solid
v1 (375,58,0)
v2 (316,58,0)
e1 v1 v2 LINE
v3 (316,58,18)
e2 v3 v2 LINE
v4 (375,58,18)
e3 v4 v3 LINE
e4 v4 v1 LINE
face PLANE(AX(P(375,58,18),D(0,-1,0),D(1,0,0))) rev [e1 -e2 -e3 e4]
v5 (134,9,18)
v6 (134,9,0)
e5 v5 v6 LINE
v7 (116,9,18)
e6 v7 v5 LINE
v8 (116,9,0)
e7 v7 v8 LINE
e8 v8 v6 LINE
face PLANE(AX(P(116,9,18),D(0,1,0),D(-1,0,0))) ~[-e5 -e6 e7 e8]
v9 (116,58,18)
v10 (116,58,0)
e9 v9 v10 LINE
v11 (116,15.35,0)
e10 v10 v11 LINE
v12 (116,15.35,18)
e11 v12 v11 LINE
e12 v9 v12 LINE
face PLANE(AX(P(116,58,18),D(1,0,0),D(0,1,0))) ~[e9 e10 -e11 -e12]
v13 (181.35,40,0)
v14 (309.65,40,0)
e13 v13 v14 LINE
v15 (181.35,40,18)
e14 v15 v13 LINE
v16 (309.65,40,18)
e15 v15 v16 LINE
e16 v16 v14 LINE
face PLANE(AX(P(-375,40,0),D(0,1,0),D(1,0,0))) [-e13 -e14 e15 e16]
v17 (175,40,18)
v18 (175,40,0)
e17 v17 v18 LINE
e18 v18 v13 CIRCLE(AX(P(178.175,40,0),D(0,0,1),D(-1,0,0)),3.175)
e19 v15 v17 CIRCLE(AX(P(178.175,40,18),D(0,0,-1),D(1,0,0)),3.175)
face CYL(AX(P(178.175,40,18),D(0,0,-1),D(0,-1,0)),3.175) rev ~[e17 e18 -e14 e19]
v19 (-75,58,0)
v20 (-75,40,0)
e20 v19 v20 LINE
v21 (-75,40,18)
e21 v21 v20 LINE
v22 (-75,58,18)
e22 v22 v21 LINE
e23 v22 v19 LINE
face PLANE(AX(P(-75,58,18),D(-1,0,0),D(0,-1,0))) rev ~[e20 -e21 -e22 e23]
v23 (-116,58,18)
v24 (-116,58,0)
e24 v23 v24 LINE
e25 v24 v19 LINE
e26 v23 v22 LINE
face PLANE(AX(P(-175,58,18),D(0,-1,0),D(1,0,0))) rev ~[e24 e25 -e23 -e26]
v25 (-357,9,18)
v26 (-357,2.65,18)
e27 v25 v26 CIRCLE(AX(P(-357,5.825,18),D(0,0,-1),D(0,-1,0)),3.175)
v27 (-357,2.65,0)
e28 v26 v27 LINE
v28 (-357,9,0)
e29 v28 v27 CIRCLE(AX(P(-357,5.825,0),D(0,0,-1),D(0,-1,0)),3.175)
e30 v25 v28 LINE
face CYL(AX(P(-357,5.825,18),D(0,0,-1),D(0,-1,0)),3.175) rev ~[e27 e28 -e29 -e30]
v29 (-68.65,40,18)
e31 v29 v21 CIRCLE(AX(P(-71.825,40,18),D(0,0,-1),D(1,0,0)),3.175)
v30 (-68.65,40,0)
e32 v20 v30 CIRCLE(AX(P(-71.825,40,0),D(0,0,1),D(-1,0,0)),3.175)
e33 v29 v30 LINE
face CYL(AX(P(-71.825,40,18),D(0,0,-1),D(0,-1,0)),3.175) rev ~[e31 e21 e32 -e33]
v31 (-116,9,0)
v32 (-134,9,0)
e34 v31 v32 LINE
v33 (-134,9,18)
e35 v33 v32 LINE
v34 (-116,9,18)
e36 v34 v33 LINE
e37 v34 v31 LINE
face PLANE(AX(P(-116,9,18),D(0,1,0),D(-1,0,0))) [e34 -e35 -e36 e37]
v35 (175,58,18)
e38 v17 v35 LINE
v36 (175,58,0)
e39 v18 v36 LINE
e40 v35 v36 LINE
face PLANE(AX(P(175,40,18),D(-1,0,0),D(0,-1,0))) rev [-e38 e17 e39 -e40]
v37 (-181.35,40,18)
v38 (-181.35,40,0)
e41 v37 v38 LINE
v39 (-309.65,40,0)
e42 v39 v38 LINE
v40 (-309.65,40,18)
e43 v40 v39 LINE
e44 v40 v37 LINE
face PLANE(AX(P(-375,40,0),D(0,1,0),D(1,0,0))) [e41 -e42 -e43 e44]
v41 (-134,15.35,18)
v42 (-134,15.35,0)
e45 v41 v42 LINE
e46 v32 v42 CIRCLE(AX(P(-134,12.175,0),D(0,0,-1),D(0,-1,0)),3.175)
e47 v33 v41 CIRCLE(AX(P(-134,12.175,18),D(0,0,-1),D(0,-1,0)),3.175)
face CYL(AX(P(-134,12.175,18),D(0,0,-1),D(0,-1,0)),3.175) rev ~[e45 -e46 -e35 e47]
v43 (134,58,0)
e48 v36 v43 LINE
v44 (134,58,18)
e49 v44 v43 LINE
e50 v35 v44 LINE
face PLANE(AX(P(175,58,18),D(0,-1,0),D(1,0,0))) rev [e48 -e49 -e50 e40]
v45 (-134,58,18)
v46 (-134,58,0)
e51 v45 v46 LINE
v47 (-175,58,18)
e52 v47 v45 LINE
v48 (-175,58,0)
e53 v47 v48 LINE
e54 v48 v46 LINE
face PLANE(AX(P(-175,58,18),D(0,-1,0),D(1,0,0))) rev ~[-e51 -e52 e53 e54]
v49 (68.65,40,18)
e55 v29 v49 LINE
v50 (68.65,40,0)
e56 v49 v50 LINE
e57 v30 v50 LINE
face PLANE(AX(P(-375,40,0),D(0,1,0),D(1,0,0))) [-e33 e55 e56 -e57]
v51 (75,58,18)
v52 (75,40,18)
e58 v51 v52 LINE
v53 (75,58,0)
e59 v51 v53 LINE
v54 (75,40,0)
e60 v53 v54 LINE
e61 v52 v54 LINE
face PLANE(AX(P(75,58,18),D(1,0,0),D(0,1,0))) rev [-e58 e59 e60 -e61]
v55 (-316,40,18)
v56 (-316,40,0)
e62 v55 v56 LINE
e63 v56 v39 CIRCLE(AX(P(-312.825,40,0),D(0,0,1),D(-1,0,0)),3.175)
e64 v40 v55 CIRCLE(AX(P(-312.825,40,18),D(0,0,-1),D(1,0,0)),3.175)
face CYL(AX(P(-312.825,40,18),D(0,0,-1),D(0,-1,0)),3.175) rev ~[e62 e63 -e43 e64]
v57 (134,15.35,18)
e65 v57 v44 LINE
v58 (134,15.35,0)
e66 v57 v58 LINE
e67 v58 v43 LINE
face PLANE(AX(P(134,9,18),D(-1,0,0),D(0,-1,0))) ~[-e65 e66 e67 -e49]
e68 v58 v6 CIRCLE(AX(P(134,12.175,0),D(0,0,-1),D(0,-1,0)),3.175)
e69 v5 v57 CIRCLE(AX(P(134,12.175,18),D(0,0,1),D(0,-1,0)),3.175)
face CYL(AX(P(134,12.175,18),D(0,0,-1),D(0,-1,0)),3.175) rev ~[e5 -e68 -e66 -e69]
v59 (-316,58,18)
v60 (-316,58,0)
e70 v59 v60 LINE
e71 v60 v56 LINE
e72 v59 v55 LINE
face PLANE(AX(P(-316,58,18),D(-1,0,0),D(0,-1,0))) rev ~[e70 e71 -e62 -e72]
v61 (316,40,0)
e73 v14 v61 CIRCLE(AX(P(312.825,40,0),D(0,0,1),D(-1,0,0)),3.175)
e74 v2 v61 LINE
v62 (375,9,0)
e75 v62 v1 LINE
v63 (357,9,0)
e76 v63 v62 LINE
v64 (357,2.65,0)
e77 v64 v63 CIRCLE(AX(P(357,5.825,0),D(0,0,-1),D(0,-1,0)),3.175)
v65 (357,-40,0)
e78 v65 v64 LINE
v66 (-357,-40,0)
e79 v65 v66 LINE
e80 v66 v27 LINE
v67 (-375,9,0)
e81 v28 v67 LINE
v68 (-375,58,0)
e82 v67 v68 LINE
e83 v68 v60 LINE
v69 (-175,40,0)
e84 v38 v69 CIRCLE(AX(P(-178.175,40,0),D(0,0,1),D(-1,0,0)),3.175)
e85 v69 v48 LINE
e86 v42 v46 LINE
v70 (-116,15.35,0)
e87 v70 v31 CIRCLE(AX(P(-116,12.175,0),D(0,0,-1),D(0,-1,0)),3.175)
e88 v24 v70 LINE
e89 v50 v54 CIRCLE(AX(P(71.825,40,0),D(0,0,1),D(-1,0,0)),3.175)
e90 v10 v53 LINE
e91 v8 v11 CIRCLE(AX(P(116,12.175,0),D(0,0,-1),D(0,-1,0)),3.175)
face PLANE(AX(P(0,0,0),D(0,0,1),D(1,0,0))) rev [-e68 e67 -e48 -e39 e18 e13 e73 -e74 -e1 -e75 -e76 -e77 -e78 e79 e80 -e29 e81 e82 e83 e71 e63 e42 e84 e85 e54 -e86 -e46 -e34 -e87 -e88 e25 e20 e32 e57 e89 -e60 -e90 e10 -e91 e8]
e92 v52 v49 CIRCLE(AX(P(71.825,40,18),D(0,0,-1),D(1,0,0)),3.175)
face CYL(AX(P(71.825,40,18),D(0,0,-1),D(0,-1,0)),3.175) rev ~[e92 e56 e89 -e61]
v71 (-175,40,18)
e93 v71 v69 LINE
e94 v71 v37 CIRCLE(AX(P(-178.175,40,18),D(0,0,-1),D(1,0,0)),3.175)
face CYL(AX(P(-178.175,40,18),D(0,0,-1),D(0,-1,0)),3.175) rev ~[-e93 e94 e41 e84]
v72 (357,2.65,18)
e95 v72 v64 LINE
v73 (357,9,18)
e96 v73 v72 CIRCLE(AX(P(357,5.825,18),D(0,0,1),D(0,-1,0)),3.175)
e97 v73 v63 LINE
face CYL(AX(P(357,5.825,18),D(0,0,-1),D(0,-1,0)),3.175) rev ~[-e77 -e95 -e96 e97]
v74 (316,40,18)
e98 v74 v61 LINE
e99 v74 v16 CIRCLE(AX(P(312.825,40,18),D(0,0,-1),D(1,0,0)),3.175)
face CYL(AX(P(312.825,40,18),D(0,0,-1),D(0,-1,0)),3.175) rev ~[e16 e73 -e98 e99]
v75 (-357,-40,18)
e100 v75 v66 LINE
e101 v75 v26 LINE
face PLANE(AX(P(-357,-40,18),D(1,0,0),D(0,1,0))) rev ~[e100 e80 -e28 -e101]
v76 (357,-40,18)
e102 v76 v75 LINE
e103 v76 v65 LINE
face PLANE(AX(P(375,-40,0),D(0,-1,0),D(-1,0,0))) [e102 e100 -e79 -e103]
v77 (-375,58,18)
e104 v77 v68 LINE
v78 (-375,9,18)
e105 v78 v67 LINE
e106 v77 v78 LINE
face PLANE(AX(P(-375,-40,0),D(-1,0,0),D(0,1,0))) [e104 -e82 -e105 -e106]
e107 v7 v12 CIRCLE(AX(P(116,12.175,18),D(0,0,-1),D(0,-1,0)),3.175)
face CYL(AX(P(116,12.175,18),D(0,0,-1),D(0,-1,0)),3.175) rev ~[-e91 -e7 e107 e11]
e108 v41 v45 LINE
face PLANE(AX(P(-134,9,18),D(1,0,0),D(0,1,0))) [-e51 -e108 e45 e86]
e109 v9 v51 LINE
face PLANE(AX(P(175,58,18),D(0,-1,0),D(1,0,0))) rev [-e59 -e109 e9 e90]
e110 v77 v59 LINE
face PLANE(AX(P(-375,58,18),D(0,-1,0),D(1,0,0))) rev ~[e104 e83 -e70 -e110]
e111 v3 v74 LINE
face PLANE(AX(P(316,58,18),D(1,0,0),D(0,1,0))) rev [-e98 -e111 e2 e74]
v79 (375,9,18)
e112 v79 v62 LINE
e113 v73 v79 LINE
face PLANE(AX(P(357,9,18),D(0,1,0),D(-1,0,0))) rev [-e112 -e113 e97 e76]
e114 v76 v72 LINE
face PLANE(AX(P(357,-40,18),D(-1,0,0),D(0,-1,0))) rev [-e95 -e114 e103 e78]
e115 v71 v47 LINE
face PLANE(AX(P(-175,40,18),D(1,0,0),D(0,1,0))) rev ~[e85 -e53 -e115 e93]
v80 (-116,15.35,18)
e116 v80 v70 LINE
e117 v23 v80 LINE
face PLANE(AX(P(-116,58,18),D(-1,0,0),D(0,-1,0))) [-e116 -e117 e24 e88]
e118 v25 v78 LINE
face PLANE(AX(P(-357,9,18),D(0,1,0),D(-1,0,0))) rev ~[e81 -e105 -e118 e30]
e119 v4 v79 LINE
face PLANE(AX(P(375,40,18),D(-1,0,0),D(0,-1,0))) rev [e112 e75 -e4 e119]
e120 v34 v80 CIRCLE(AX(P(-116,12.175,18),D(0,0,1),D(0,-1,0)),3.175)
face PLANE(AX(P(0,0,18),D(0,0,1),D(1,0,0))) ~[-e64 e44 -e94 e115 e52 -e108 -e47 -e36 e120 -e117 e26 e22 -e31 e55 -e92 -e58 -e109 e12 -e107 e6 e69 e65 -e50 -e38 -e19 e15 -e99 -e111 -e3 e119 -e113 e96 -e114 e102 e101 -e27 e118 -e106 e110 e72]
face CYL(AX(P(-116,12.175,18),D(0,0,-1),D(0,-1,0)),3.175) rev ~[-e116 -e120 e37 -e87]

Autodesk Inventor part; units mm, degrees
ref_plane "YZ Plane" through (0, 0, 0) normal (1, 0, 0) x (0, 1, 0)
sketch "Sketch1" plane through (0, 0, 0) normal (0, 0, 1) x (1, 0, 0)
  line L0 (-375, 40) -> (375, 40)
  line L1 (375, 40) -> (375, -40)
  line L2 (375, -40) -> (-375, -40)
  line L3 (-375, -40) -> (-375, 40)
  point P0 (0, 0)
  point P1 (375, 0)
  point P2 (0, 40)
  dimension "d0" = 750
  dimension "d1" = 80
extrude "Extrusion1" add sketch "Sketch1" along normal blind 18
sketch "Sketch2" plane through (0, 0, 18) normal (0, 0, 1) x (1, 0, 0)
  line L0 (375, 40) -> (-375, 40) projected
  line L1 (-375, 40) -> (-375, -40) projected
  line L2 (-375, -40) -> (375, -40) projected
  line L3 (375, -40) -> (375, 40) projected
  line L4 (-375, 58) -> (-316, 58)
  line L5 (-316, 58) -> (-316, 40)
  line L6 (-316, 40) -> (-375, 40)
  line L7 (-375, 40) -> (-375, 58)
  point P0 (0, 0)
  point P1 (-345.5, 40)
  point P2 (0, 40)
  point P3 (-375, 49)
  point P4 (-375, 0)
  dimension "d4" = 18
  dimension "d5" = 59
extrude "Extrusion2" add sketch "Sketch2" against normal blind 18 contours L0 L7 L4 L5
sketch "Sketch3" plane through (0, 0, 18) normal (0, 0, 1) x (1, 0, 0)
  line L0 (-175, 58) -> (-75, 58)
  line L1 (-75, 58) -> (-75, 40)
  line L2 (-75, 40) -> (-175, 40)
  line L3 (-175, 40) -> (-175, 58)
  line L4 (375, 40) -> (-316, 40) projected
  line L5 (-316, 58) -> (-316, 40) projected
  line L6 (-375, 58) -> (-316, 58) projected
  line L7 (-375, -40) -> (-375, 58) projected
  line L8 (-375, -40) -> (375, -40) projected
  line L9 (375, -40) -> (375, 40) projected
  point P0 (0, 0)
  point P1 (-125, 40)
  point P2 (29.5, 40)
  dimension "d8" = 100
  dimension "d9" = 18
  dimension "d10" = 250
extrude "Extrusion3" add sketch "Sketch3" against normal blind 18 contours L0 L1 L2 L3
sketch "Sketch4" plane through (0, 0, 18) normal (0, 0, 1) x (1, 0, 0)
  line L0 (375, 40) -> (-75, 40) projected
  line L1 (-75, 58) -> (-75, 40) projected
  line L2 (-175, 58) -> (-75, 58) projected
  line L3 (-175, 40) -> (-175, 58) projected
  line L4 (-175, 40) -> (-316, 40) projected
  line L5 (-316, 58) -> (-316, 40) projected
  line L6 (-375, 58) -> (-316, 58) projected
  line L7 (-375, -40) -> (-375, 58) projected
  line L8 (-375, -40) -> (375, -40) projected
  line L9 (375, -40) -> (375, 40) projected
  line L10 (-375, -40) -> (-357, -40)
  line L11 (-357, -40) -> (-357, 9)
  line L12 (-357, 9) -> (-375, 9)
  line L13 (-375, 9) -> (-375, -40)
  point P0 (0, 0)
  point P1 (-366, -40)
  point P2 (0, -40)
  point P3 (-375, -15.5)
  point P4 (-375, 9)
  dimension "d13" = 18
  dimension "d14" = 49
extrude "Extrusion4" cut sketch "Sketch4" against normal blind 18 contours L8 L7 L12 L11
sketch "Sketch5" plane through (0, 0, 18) normal (0, 0, 1) x (1, 0, 0)
  line L0 (-134, 58) -> (-116, 58)
  line L1 (-116, 58) -> (-116, 9)
  line L2 (-116, 9) -> (-134, 9)
  line L3 (-134, 9) -> (-134, 58)
  line L4 (-375, 9) -> (-357, 9) projected
  line L5 (-357, 9) -> (-357, -40) projected
  line L6 (-357, -40) -> (375, -40) projected
  line L7 (375, -40) -> (375, 40) projected
  line L8 (375, 40) -> (-75, 40) projected
  line L9 (-75, 58) -> (-75, 40) projected
  line L10 (-175, 58) -> (-75, 58) projected
  line L11 (-175, 40) -> (-175, 58) projected
  line L12 (-175, 40) -> (-316, 40) projected
  line L13 (-316, 58) -> (-316, 40) projected
  line L14 (-375, 58) -> (-316, 58) projected
  line L15 (-375, 9) -> (-375, 58) projected
  line L16 (-175, 58) -> (-75, 58) projected
  point P0 (0, 0)
  point P1 (-125, 58)
  point P2 (-125, 58)
  point P3 (-125, 58)
  dimension "d17" = 18
  dimension "d18" = 49
extrude "Extrusion5" cut sketch "Sketch5" against normal blind 18 contours L0 L1 L2 L3
ref_plane "Work Plane1" through (0, 58, 0) normal (-1, 0, 0) x (0, 0, 1)
mirror "Mirror1" about plane through (0, 58, 0) normal (-1, 0, 0) of "Extrusion5", "Extrusion4", "Extrusion3", "Extrusion2"
sketch "Sketch6" plane through (0, 0, 18) normal (0, 0, 1) x (1, 0, 0)
  line L0 (357, 9) -> (375, 9) projected
  line L1 (375, 9) -> (375, 58) projected
  line L2 (375, 58) -> (316, 58) projected
  line L3 (316, 58) -> (316, 40) projected
  line L4 (316, 40) -> (175, 40) projected
  line L5 (175, 40) -> (175, 58) projected
  line L6 (175, 58) -> (134, 58) projected
  line L7 (134, 58) -> (134, 9) projected
  line L8 (134, 9) -> (116, 9) projected
  line L9 (116, 9) -> (116, 58) projected
  line L10 (116, 58) -> (75, 58) projected
  line L11 (75, 58) -> (75, 40) projected
  line L12 (75, 40) -> (-75, 40) projected
  line L13 (-75, 58) -> (-75, 40) projected
  line L14 (-116, 58) -> (-75, 58) projected
  line L15 (-116, 58) -> (-116, 9) projected
  line L16 (-116, 9) -> (-134, 9) projected
  line L17 (-134, 9) -> (-134, 58) projected
  line L18 (-175, 58) -> (-134, 58) projected
  line L19 (-175, 40) -> (-175, 58) projected
  line L20 (-175, 40) -> (-316, 40) projected
  line L21 (-316, 58) -> (-316, 40) projected
  line L22 (-375, 58) -> (-316, 58) projected
  line L23 (-375, 9) -> (-375, 58) projected
  line L24 (-375, 9) -> (-357, 9) projected
  line L25 (-357, 9) -> (-357, -40) projected
  line L26 (-357, -40) -> (357, -40) projected
  line L27 (357, -40) -> (357, 9) projected
  point P0 (0, 0)
  point P1 (-357, 5.825)
  point P2 (-312.825, 40)
  dimension "d21" = 3.175
  dimension "d22" = 3.175
hole "Hole1" at (-357, 5.825, 18) at (-312.825, 40, 18) direction (0, 0, -1) diameter 6.35 end through all
mirror "Mirror2" about plane through (0, 58, 0) normal (-1, 0, 0) of "Hole1"
sketch "Sketch7" plane through (0, 0, 18) normal (0, 0, 1) x (1, 0, 0)
  arc A0 (357, 9) -> (357, 2.65) centre (357, 5.825) ccw projected
  line L0 (357, 9) -> (375, 9) projected
  line L1 (375, 9) -> (375, 58) projected
  line L2 (375, 58) -> (316, 58) projected
  line L3 (316, 58) -> (316, 40) projected
  arc A1 (309.65, 40) -> (316, 40) centre (312.825, 40) ccw projected
  line L4 (309.65, 40) -> (175, 40) projected
  line L5 (175, 40) -> (175, 58) projected
  line L6 (175, 58) -> (134, 58) projected
  line L7 (134, 58) -> (134, 9) projected
  line L8 (134, 9) -> (116, 9) projected
  line L9 (116, 9) -> (116, 58) projected
  line L10 (116, 58) -> (75, 58) projected
  line L11 (75, 58) -> (75, 40) projected
  line L12 (75, 40) -> (-75, 40) projected
  line L13 (-75, 58) -> (-75, 40) projected
  line L14 (-116, 58) -> (-75, 58) projected
  line L15 (-116, 58) -> (-116, 9) projected
  line L16 (-116, 9) -> (-134, 9) projected
  line L17 (-134, 9) -> (-134, 58) projected
  line L18 (-175, 58) -> (-134, 58) projected
  line L19 (-175, 40) -> (-175, 58) projected
  line L20 (-175, 40) -> (-309.65, 40) projected
  arc A2 (-316, 40) -> (-309.65, 40) centre (-312.825, 40) ccw projected
  line L21 (-316, 58) -> (-316, 40) projected
  line L22 (-375, 58) -> (-316, 58) projected
  line L23 (-375, 9) -> (-375, 58) projected
  line L24 (-375, 9) -> (-357, 9) projected
  arc A3 (-357, 2.65) -> (-357, 9) centre (-357, 5.825) ccw projected
  line L25 (-357, 2.65) -> (-357, -40) projected
  line L26 (-357, -40) -> (357, -40) projected
  line L27 (357, -40) -> (357, 2.65) projected
  point P0 (0, 0)
  point P1 (-178.175, 40)
  point P2 (-134, 12.175)
  point P3 (-242.325, 40)
  dimension "d30" = 3.175
  dimension "d31" = 3.175
hole "Hole2" at (-178.175, 40, 18) at (-134, 12.175, 18) direction (0, 0, -1) diameter 6.35 end through all
ref_plane "Work Plane2" through (-125, 58, 18) normal (1, 0, 0) x (0, 0, -1)
mirror "Mirror3" about plane through (-125, 58, 18) normal (1, 0, 0) of "Hole2"
mirror "Mirror4" about plane through (0, 58, 0) normal (-1, 0, 0) of "Hole2", "Mirror3"
equation "\"d0\" = tableWidth"
equation "\"d1\" = legTopDepth"
equation "\"d2\" = plyThickness"
equation "\"d4\" = legTopTabHeight"
equation "\"d5\" = 0.5 * plyThickness + 0.5 * legTabTotalWidth"
equation "\"d6\" = plyThickness"
equation "\"d8\" = legTabTotalWidth"
equation "\"d9\" = legTopTabHeight"
equation "\"d10\" = 0.333333 * tableWidth"
equation "\"d11\" = plyThickness"
equation "\"d13\" = plyThickness"
equation "\"d14\" = legTopSlotDepth"
equation "\"d15\" = plyThickness"
equation "\"d17\" = plyThickness"
equation "\"d18\" = legTopSlotDepth"
equation "\"d19\" = plyThickness"
equation "\"d21\" = 0.5 * millDiameter"
equation "\"d22\" = 0.5 * millDiameter"
equation "\"d23\" = millDiameter"
equation "\"d30\" = 0.5 * millDiameter"
equation "\"d31\" = 0.5 * millDiameter"
equation "\"d32\" = millDiameter"
equation "\"plyThickness\" = 18"
equation "\"legHeight\" = 702"
equation "\"tableWidth\" = 750"
equation "\"legTopDepth\" = 80"
equation "\"millDiameter\" = 6.35"
equation "\"legTopTabHeight\" = 18"
equation "\"legTabTotalWidth\" = 100"
equation "\"legTopSlotDepth\" = 49"
properties part number "shortSlat"
